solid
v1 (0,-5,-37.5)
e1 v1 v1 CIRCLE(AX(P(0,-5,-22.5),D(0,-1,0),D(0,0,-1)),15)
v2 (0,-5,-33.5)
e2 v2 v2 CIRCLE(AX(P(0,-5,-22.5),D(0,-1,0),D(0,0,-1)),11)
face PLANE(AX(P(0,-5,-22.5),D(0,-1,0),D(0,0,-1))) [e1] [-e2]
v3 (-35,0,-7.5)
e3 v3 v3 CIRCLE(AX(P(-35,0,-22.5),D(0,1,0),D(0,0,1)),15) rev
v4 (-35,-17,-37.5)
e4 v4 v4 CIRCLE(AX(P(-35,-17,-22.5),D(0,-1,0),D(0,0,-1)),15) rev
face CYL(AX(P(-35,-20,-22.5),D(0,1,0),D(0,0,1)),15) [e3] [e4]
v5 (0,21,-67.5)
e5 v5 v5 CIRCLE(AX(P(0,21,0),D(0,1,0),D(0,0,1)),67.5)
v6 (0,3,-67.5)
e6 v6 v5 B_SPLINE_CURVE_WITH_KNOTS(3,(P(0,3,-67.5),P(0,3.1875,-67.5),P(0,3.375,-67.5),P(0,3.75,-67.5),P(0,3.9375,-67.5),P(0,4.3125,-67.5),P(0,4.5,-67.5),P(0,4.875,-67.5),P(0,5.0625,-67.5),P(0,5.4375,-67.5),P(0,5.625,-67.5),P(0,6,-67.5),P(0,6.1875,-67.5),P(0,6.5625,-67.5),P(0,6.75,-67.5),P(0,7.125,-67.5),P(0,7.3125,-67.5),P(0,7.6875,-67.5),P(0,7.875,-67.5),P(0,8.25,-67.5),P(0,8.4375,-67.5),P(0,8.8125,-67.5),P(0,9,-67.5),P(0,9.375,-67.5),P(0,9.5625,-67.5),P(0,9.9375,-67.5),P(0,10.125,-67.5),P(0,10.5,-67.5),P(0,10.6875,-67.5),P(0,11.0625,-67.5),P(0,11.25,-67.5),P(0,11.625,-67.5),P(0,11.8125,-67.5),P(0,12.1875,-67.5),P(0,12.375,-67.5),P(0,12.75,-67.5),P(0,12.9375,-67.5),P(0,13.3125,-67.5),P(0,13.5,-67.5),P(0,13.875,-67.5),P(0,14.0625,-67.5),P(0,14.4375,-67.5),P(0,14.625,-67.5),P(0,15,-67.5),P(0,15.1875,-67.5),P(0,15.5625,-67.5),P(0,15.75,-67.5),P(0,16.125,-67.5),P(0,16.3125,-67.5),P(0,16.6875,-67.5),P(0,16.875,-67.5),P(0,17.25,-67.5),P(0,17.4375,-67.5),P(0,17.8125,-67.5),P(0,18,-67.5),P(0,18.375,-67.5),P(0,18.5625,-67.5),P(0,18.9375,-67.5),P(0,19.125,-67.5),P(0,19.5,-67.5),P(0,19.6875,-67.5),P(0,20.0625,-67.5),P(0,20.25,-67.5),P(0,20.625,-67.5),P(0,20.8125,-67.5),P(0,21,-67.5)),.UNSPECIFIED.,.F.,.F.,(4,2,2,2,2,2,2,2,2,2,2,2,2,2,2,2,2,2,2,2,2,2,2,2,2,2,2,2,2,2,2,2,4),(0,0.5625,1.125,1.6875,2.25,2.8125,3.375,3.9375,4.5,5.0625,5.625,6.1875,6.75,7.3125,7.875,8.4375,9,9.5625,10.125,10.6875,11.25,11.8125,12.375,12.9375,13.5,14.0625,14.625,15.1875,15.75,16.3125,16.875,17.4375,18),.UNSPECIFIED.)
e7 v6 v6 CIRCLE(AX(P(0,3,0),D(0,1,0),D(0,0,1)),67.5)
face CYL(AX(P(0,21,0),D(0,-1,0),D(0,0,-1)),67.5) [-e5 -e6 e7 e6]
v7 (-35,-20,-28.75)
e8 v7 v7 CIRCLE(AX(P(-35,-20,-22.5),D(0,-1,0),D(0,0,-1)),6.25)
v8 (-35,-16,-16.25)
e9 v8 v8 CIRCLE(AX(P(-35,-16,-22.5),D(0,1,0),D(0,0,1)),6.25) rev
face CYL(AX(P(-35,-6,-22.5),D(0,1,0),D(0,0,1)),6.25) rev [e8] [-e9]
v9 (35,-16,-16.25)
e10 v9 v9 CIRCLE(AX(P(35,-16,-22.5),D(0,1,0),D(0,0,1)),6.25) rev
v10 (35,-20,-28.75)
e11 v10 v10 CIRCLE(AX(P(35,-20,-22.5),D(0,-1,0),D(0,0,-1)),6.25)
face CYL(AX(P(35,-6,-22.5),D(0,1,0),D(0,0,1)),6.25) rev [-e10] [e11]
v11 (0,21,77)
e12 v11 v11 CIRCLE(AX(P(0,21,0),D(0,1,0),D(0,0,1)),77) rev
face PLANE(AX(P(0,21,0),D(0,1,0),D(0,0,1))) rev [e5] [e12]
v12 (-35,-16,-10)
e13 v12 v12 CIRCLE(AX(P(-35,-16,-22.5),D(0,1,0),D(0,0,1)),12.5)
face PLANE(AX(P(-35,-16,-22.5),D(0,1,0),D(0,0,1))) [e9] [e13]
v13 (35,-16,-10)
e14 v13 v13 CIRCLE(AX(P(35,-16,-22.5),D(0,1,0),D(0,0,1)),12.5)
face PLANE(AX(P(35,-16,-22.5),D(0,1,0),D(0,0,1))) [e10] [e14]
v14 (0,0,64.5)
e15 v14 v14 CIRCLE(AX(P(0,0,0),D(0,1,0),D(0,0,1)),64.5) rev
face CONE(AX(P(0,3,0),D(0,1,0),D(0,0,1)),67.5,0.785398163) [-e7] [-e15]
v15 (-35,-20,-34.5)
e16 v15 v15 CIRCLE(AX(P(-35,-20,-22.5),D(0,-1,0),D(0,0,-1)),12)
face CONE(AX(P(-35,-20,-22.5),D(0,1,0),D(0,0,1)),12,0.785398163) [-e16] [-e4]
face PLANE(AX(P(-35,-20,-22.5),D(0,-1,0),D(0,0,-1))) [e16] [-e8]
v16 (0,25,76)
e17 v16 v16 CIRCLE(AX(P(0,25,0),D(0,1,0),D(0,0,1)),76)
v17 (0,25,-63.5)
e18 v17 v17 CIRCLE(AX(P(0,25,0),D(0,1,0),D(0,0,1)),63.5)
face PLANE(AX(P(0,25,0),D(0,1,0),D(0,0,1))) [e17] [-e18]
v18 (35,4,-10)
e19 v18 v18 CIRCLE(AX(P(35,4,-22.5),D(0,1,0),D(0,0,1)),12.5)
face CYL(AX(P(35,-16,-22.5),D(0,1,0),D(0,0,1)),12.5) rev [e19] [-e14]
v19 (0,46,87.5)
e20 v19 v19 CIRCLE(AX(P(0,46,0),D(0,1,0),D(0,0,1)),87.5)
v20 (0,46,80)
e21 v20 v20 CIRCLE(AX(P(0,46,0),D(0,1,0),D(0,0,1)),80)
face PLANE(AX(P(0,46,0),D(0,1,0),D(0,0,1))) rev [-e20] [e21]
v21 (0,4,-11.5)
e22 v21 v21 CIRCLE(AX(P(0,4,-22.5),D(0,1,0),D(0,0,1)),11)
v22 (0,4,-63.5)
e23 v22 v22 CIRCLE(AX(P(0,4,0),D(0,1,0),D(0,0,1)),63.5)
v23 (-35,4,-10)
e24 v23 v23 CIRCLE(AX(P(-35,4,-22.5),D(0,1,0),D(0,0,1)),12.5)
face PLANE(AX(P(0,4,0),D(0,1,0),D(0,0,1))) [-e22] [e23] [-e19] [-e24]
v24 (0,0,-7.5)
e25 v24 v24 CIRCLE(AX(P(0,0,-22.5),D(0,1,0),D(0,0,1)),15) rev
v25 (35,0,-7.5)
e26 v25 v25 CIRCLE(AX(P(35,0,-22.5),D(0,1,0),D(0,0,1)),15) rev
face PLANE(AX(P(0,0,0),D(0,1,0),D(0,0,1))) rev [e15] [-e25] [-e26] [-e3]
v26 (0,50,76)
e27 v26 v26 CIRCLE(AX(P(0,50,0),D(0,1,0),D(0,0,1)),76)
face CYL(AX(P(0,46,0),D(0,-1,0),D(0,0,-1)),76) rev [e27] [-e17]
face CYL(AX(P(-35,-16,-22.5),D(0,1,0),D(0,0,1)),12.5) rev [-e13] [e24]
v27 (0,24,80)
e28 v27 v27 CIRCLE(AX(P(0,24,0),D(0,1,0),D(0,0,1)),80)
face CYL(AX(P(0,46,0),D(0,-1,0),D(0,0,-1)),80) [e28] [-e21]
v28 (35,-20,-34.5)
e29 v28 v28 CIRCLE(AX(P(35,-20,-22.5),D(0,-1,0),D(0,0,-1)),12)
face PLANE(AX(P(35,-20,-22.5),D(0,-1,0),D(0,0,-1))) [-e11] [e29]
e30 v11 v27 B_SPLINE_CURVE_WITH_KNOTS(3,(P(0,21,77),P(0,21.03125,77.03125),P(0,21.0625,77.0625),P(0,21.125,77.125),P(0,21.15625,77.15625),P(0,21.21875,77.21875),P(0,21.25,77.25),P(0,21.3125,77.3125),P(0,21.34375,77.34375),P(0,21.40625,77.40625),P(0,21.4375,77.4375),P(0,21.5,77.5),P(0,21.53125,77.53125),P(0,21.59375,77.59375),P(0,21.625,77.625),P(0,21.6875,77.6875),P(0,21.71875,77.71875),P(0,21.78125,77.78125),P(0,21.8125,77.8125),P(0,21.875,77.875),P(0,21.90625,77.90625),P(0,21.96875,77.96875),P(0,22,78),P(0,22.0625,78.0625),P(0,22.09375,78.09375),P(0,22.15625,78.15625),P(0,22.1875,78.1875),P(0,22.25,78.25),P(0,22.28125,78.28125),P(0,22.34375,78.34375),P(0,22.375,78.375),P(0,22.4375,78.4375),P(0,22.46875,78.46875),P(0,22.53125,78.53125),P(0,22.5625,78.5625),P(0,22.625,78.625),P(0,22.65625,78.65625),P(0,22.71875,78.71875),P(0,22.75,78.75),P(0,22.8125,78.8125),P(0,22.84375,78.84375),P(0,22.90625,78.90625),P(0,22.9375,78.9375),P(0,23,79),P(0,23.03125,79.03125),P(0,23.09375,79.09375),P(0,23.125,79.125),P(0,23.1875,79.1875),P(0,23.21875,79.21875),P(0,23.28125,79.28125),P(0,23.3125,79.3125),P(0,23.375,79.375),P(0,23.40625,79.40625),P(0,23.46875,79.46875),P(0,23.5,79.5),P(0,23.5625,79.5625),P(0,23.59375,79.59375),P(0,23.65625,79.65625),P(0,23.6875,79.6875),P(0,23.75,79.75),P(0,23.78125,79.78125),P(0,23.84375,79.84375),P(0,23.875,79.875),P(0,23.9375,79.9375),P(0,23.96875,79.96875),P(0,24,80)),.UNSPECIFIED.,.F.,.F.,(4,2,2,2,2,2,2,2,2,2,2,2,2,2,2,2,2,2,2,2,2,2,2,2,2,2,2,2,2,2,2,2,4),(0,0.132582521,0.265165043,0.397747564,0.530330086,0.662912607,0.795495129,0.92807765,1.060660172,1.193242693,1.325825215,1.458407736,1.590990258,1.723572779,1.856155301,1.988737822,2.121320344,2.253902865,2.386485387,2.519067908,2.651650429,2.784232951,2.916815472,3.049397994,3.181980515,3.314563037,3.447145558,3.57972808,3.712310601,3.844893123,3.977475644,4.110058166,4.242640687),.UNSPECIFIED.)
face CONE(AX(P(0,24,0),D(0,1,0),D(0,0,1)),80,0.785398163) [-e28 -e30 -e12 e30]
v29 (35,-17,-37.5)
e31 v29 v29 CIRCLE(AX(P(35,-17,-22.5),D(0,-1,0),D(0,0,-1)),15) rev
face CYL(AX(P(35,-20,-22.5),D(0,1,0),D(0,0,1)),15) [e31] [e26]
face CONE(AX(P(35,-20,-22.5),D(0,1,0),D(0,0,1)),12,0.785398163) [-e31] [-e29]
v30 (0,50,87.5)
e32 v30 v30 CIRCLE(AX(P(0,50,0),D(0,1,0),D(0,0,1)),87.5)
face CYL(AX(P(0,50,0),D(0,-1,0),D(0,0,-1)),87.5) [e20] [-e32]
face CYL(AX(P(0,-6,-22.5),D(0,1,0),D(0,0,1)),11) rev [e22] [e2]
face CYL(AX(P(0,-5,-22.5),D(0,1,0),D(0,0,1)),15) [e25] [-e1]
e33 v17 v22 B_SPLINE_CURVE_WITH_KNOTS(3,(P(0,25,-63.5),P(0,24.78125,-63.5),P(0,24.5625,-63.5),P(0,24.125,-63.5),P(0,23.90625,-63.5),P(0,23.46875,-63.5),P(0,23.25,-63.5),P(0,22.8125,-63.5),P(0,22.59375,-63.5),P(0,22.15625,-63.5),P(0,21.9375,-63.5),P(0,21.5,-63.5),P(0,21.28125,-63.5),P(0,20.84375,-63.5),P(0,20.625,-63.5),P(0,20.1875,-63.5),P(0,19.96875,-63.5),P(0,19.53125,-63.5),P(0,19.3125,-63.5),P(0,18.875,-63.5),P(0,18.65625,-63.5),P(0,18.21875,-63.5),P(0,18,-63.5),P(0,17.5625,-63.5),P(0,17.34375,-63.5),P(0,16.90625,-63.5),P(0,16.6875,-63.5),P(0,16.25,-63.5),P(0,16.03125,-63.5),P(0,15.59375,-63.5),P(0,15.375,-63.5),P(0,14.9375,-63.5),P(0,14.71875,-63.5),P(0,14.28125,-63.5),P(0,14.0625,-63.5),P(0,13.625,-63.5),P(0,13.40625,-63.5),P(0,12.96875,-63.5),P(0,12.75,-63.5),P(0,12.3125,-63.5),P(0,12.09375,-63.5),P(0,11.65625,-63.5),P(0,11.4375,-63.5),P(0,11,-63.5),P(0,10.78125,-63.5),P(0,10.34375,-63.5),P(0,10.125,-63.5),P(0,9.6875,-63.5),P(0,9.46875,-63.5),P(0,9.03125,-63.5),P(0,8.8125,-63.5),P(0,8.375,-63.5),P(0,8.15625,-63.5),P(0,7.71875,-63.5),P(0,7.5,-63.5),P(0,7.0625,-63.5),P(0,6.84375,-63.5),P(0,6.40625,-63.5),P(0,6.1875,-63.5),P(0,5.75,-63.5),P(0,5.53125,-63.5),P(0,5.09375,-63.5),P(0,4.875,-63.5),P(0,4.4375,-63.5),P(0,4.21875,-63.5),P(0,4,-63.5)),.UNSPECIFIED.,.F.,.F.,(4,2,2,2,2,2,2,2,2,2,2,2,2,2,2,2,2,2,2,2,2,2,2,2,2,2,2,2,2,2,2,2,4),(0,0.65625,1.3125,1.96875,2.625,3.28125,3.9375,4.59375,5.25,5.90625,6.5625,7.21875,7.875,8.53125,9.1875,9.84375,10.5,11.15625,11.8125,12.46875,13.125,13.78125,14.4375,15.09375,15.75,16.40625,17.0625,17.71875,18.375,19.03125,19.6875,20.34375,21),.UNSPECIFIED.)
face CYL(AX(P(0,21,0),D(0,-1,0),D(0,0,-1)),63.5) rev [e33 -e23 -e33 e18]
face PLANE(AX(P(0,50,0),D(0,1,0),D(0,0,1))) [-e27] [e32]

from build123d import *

# Parameters (mm, degrees)
SKETCH1_R            = 67.5
BOSS_EXTRUDE1_DEPTH  = 21
SKETCH3_R            = 80
BOSS_EXTRUDE2_DEPTH  = 25
SKETCH4_R            = 87.5
BOSS_EXTRUDE3_DEPTH  = 4
SHELL1_START         = 4
SHELL1_OUTLINE_R     = 63.5
SHELL1_DEPTH         = 46
SHELL1_START_2       = 25
SHELL1_2_OUTLINE_R   = 76
SHELL1_2_OUTLINE_R_2 = 63.5
SHELL1_2_DEPTH       = 25
SKETCH2_R            = 11
SKETCH2_R_2          = 6.25
CUT_EXTRUDE1_DEPTH   = 10
SKETCH5_R            = 15
SKETCH5_R_2          = 6.25
BOSS_EXTRUDE4_DEPTH  = 20
SKETCH6_R            = 12.5
CUT_EXTRUDE2_DEPTH   = 20
CHAMFER1_SIZE        = 3
CHAMFER2_SIZE        = 3
SKETCH7_R            = 15
SKETCH7_R_2          = 11
BOSS_EXTRUDE5_DEPTH  = 5


# Read off the part's stored shape, not the designer's step: Shell1
with BuildPart() as part:
    # Sketch1 → Boss-Extrude1 (new body)
    with BuildSketch(Plane(origin=(0, 0, 0), x_dir=(1, 0, 0), z_dir=(0, 1, 0))):
        with Locations(Location((0, 0, 0), (0, 0, 90))):
            Circle(SKETCH1_R)
    extrude(amount=BOSS_EXTRUDE1_DEPTH)

    # Sketch3 → Boss-Extrude2 (add)
    with BuildSketch(Plane(origin=(0, 21, 0), x_dir=(1, 0, 0), z_dir=(0, 1, 0))):
        with Locations(Location((0, 0, 0), (0, 0, 270))):
            Circle(SKETCH3_R)
    extrude(amount=BOSS_EXTRUDE2_DEPTH)

    # Sketch4 → Boss-Extrude3 (add)
    with BuildSketch(Plane(origin=(0, 46, 0), x_dir=(1, 0, 0), z_dir=(0, 1, 0))):
        with Locations(Location((0, 0, 0), (0, 0, 270))):
            Circle(SKETCH4_R)
    extrude(amount=BOSS_EXTRUDE3_DEPTH)

    # Shell1 outline → Shell1 (cut)
    with BuildSketch(Plane(origin=(0, 0, 0), x_dir=(1, 0, 0), z_dir=(0, 1, 0)).offset(SHELL1_START)):
        Circle(SHELL1_OUTLINE_R)
    extrude(amount=SHELL1_DEPTH, mode=Mode.SUBTRACT)

    # Shell1 2 outline → Shell1 2 (cut)
    with BuildSketch(Plane(origin=(0, 0, 0), x_dir=(1, 0, 0), z_dir=(0, 1, 0)).offset(SHELL1_START_2)):
        Circle(SHELL1_2_OUTLINE_R)
        Circle(SHELL1_2_OUTLINE_R_2, mode=Mode.SUBTRACT)
    extrude(amount=SHELL1_2_DEPTH, mode=Mode.SUBTRACT)

    # Sketch2 → Cut-Extrude1 (cut)
    with BuildSketch(Plane(origin=(0, 4, 0), x_dir=(1, 0, 0), z_dir=(0, 1, 0))):
        with Locations(Location((0, 22.5, 0), (0, 0, 270))):
            Circle(SKETCH2_R)
        with Locations(Location((-35, 22.5, 0), (0, 0, 270))):
            Circle(SKETCH2_R_2)
        with Locations(Location((35, 22.5, 0), (0, 0, 270))):
            Circle(SKETCH2_R_2)
    extrude(amount=-CUT_EXTRUDE1_DEPTH, mode=Mode.SUBTRACT)

    # Sketch5 → Boss-Extrude4 (add)
    # profile 1 of 2: a face of its own
    with BuildSketch(Plane.XZ):
        with Locations(Location((35, -22.5, 0), (0, 0, 90))):
            Circle(SKETCH5_R)
        with Locations(Location((35, -22.5, 0), (0, 0, 90))):
            Circle(SKETCH5_R_2, mode=Mode.SUBTRACT)
    # profile 2 of 2: a face of its own
    with BuildSketch(Plane.XZ):
        with Locations(Location((-35, -22.5, 0), (0, 0, 90))):
            Circle(SKETCH5_R)
        with Locations(Location((-35, -22.5, 0), (0, 0, 90))):
            Circle(SKETCH5_R_2, mode=Mode.SUBTRACT)
    extrude(amount=BOSS_EXTRUDE4_DEPTH)

    # Sketch6 → Cut-Extrude2 (cut)
    with BuildSketch(Plane(origin=(0, 4, 0), x_dir=(1, 0, 0), z_dir=(0, 1, 0))):
        with Locations(Location((-35, 22.5, 0), (0, 0, 270))):
            Circle(SKETCH6_R)
        with Locations(Location((35, 22.5, 0), (0, 0, 270))):
            Circle(SKETCH6_R)
    extrude(amount=-CUT_EXTRUDE2_DEPTH, mode=Mode.SUBTRACT)

    # Chamfer1
    chamfer1_edges = [part.edges().sort_by_distance(p)[0] for p in [
        (0, 0, 67.5),
        (0, 21, -80),
    ]]
    chamfer(chamfer1_edges, length=CHAMFER1_SIZE)

    # Chamfer2
    chamfer2_edges = [part.edges().sort_by_distance(p)[0] for p in [
        (35, -20, -37.5),
        (-35, -20, -37.5),
    ]]
    chamfer(chamfer2_edges, length=CHAMFER2_SIZE)

    # Sketch7 → Boss-Extrude5 (add)
    with BuildSketch(Plane.XZ):
        with Locations(Location((0, -22.5, 0), (0, 0, 90))):
            Circle(SKETCH7_R)
        with Locations(Location((0, -22.5, 0), (0, 0, 90))):
            Circle(SKETCH7_R_2, mode=Mode.SUBTRACT)
    extrude(amount=BOSS_EXTRUDE5_DEPTH)


solid = part.part
